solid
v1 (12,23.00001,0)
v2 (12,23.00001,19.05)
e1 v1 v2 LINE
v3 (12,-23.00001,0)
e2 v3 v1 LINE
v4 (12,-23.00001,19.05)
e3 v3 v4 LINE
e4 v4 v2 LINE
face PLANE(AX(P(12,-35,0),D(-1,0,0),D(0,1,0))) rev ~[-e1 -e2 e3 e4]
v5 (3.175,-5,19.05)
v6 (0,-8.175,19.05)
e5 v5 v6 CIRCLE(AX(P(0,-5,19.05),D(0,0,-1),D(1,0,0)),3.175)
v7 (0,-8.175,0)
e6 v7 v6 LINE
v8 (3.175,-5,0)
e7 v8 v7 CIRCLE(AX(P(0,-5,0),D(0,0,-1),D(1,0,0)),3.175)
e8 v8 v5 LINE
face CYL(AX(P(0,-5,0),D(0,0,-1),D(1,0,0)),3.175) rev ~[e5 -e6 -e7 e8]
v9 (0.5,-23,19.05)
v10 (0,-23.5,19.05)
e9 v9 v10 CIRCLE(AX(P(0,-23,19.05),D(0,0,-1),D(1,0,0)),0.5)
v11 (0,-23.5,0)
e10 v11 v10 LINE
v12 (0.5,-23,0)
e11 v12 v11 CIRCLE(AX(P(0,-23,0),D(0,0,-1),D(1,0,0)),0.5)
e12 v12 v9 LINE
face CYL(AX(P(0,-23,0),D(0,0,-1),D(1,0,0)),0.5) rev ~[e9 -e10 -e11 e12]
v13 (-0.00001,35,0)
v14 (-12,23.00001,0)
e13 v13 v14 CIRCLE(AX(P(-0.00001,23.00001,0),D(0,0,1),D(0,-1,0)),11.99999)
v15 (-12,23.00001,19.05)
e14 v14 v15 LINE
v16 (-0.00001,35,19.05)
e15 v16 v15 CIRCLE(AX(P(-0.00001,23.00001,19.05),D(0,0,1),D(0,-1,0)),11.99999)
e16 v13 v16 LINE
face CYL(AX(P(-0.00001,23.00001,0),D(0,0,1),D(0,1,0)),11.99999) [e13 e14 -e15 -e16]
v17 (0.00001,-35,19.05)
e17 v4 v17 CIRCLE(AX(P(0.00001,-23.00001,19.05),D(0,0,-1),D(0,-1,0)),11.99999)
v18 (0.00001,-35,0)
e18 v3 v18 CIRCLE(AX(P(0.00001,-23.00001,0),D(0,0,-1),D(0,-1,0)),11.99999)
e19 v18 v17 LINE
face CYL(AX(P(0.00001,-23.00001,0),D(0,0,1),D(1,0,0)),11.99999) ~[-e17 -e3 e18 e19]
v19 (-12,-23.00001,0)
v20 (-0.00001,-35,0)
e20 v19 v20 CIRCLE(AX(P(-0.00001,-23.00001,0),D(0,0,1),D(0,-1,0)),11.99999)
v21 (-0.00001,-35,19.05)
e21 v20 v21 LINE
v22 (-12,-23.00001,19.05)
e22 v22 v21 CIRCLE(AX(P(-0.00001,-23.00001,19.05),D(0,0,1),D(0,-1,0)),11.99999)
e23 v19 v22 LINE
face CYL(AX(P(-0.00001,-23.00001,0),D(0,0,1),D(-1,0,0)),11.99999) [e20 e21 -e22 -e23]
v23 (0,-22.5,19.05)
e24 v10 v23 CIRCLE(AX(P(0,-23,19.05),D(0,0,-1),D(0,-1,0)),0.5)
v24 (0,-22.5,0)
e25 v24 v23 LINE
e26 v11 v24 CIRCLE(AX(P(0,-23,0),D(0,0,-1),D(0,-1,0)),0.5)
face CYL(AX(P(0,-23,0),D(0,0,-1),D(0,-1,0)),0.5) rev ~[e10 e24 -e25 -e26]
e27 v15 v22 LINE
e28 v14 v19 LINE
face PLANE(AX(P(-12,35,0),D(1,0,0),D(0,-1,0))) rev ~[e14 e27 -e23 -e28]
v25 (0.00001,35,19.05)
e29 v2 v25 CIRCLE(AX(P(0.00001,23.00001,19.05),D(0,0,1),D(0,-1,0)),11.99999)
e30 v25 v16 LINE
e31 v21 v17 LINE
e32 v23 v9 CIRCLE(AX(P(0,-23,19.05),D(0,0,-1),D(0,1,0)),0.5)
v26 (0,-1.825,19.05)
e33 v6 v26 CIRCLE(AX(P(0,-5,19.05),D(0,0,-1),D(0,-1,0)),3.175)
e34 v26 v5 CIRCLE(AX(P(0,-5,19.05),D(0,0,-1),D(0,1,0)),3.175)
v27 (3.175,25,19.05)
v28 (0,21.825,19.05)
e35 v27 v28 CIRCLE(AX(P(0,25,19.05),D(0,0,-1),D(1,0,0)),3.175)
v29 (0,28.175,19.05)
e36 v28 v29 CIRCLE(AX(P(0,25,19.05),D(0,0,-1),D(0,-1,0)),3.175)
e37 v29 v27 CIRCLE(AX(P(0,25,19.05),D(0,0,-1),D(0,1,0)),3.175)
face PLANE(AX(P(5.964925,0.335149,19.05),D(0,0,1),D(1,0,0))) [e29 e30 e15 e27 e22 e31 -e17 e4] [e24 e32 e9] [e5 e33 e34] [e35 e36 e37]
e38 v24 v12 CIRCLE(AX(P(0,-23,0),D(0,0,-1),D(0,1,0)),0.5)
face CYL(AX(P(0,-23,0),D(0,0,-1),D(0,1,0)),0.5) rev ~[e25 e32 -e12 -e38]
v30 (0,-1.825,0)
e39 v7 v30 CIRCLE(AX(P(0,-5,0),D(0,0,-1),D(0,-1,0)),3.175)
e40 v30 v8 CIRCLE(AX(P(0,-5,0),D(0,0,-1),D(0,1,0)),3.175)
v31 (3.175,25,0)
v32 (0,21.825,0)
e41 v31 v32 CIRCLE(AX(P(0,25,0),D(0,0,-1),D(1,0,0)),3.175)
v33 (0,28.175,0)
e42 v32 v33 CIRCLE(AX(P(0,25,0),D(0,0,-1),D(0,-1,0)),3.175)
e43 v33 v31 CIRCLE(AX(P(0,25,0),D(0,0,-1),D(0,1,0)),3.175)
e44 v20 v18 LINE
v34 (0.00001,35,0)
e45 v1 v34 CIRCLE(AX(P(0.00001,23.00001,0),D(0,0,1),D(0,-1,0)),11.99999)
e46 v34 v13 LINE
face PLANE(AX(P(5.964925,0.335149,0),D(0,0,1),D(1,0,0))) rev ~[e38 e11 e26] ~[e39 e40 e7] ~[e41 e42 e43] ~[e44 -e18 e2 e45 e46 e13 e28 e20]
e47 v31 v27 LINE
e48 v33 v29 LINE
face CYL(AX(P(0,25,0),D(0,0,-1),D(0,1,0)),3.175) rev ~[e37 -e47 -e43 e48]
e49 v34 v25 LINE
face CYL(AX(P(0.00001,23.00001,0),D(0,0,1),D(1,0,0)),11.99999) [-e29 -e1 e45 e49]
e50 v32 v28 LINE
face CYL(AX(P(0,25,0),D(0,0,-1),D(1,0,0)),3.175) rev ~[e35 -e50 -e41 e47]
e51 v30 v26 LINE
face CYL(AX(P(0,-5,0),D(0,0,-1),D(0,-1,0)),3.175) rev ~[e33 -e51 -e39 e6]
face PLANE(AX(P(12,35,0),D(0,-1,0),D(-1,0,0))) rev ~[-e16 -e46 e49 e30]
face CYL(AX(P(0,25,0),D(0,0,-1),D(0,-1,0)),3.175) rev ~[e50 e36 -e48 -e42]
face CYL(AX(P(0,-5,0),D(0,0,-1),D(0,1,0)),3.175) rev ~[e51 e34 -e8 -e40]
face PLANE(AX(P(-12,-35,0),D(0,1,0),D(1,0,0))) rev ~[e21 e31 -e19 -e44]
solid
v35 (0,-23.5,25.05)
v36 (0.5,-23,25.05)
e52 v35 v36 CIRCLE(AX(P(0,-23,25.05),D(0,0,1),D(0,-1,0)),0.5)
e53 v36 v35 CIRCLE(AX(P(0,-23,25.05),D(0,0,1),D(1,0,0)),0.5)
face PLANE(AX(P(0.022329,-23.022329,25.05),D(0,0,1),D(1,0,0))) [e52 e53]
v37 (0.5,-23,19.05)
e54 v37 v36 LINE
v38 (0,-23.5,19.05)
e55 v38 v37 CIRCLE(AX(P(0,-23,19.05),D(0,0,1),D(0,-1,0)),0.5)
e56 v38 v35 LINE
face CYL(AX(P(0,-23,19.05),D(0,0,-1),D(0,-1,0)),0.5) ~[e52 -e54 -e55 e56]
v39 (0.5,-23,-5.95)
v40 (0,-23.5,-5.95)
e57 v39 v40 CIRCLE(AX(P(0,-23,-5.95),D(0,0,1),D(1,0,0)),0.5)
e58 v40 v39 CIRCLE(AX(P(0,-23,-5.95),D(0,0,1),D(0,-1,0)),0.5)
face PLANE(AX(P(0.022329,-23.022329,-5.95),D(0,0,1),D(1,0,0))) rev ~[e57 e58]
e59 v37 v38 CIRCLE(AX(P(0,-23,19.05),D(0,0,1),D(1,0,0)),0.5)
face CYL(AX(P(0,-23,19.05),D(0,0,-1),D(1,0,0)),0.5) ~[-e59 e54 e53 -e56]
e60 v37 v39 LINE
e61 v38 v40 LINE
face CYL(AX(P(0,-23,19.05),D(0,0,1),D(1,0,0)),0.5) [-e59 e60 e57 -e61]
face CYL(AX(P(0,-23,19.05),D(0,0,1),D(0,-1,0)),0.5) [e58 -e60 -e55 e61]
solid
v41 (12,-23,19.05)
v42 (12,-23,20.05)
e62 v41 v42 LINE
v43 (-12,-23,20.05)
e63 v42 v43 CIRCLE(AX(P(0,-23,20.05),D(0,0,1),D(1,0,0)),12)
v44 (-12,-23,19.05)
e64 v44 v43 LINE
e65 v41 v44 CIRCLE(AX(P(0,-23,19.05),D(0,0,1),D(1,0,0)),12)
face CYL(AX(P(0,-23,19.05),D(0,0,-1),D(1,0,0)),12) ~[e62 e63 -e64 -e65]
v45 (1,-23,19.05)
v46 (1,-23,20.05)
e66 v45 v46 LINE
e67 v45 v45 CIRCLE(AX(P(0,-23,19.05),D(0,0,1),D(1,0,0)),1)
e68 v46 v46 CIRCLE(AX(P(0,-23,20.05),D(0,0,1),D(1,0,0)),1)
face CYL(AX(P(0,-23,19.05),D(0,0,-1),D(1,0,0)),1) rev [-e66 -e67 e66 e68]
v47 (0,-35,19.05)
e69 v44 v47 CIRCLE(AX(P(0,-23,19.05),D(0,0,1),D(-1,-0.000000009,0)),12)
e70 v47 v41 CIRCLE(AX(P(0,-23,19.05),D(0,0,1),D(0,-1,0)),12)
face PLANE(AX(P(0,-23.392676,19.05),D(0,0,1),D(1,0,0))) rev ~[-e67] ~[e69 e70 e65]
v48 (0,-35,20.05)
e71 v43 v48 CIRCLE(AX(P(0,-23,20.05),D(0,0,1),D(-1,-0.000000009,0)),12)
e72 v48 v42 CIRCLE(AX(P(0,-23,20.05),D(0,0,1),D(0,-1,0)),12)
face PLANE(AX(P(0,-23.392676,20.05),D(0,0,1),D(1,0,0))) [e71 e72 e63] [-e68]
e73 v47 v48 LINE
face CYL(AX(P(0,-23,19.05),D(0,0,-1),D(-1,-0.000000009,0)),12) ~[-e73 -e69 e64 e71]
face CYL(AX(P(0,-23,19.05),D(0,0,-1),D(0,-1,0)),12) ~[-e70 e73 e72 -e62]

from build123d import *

# Parameters (mm, degrees)
F1_DEPTH      = 19.05
F2_R          = 1
F3_DEPTH      = 1
F5_DEPTH      = 6
F5_DEPTH_BACK = 25
F6_R          = 11.99999


# Not quite as in the source:
# - a fillet or chamfer is up to 0.001 mm smaller than in the source, because OpenCascade refuses the exact size


with BuildPart() as f1:
    # F0 (on Top) → F1 (new body)
    with BuildSketch(Plane.XY):
        with BuildLine():
            Line((12, -35), (12, 35))
            Line((12, 35), (0, 35))
            Line((0, 35), (0, 28.175))
            ThreePointArc((0, 28.175), (2.2450640303, 27.2450640303), (3.175, 25))
            ThreePointArc((3.175, 25), (2.2450640303, 22.7549359697), (0, 21.825))
            Line((0, 21.825), (0, -1.825))
            ThreePointArc((0, -1.825), (2.2450640303, -2.7549359697), (3.175, -5))
            ThreePointArc((3.175, -5), (2.2450640303, -7.2450640303), (0, -8.175))
            Line((0, -8.175), (0, -22.5))
            ThreePointArc((0, -22.5), (0.3535533906, -22.6464466094), (0.5, -23))
            ThreePointArc((0.5, -23), (0.3535533906, -23.3535533906), (0, -23.5))
            Line((0, -23.5), (0, -35))
            Line((0, -35), (12, -35))
        make_face()
        with BuildLine():
            Line((0, 28.175), (0, 35))
            Line((0, 35), (-12, 35))
            Line((-12, 35), (-12, -35))
            Line((-12, -35), (0, -35))
            Line((0, -35), (0, -23.5))
            ThreePointArc((0, -23.5), (-0.5, -23), (0, -22.5))
            Line((0, -22.5), (0, -8.175))
            ThreePointArc((0, -8.175), (-3.175, -5), (0, -1.825))
            Line((0, -1.825), (0, 21.825))
            ThreePointArc((0, 21.825), (-3.175, 25), (0, 28.175))
        make_face()
    extrude(amount=F1_DEPTH)

    # F6 (radius 12 in the source; OpenCascade refuses exactly that, so slightly less here)
    f6_edges = [f1.edges().sort_by_distance(p)[0] for p in [
        (-12, 35, 9.525),
        (12, 35, 9.525),
        (12, -35, 9.525),
        (-12, -35, 9.525),
    ]]
    fillet(f6_edges, radius=F6_R)


with BuildPart() as f3:
    # F2 (on face) → F3 (new body)
    with BuildSketch(Plane.XY.offset(19.05)):
        with BuildLine():
            ThreePointArc((0, -35), (8.4852813742, -31.4852813742), (12, -23))
            ThreePointArc((12, -23), (-5.29e-08, -11), (-12, -23.0000001058))
            ThreePointArc((-12, -23.0000001058), (-8.4852813368, -31.4852814116), (0, -35))
        make_face()
        with Locations((0, -23)):
            Circle(F2_R, mode=Mode.SUBTRACT)
    extrude(amount=F3_DEPTH)


with BuildPart() as f5:
    # F4 (on face) → F5 (new body, two sides)
    with BuildSketch(Plane.XY.offset(19.05)) as f5_sk:
        with BuildLine():
            ThreePointArc((0, -23.5), (0.3535533906, -23.3535533906), (0.5, -23))
            ThreePointArc((0.5, -23), (-0.3535533906, -22.6464466094), (0, -23.5))
        make_face()
    extrude(amount=F5_DEPTH)
    extrude(f5_sk.sketch, amount=-F5_DEPTH_BACK)


solid = Compound([f1.part, f3.part, f5.part])
